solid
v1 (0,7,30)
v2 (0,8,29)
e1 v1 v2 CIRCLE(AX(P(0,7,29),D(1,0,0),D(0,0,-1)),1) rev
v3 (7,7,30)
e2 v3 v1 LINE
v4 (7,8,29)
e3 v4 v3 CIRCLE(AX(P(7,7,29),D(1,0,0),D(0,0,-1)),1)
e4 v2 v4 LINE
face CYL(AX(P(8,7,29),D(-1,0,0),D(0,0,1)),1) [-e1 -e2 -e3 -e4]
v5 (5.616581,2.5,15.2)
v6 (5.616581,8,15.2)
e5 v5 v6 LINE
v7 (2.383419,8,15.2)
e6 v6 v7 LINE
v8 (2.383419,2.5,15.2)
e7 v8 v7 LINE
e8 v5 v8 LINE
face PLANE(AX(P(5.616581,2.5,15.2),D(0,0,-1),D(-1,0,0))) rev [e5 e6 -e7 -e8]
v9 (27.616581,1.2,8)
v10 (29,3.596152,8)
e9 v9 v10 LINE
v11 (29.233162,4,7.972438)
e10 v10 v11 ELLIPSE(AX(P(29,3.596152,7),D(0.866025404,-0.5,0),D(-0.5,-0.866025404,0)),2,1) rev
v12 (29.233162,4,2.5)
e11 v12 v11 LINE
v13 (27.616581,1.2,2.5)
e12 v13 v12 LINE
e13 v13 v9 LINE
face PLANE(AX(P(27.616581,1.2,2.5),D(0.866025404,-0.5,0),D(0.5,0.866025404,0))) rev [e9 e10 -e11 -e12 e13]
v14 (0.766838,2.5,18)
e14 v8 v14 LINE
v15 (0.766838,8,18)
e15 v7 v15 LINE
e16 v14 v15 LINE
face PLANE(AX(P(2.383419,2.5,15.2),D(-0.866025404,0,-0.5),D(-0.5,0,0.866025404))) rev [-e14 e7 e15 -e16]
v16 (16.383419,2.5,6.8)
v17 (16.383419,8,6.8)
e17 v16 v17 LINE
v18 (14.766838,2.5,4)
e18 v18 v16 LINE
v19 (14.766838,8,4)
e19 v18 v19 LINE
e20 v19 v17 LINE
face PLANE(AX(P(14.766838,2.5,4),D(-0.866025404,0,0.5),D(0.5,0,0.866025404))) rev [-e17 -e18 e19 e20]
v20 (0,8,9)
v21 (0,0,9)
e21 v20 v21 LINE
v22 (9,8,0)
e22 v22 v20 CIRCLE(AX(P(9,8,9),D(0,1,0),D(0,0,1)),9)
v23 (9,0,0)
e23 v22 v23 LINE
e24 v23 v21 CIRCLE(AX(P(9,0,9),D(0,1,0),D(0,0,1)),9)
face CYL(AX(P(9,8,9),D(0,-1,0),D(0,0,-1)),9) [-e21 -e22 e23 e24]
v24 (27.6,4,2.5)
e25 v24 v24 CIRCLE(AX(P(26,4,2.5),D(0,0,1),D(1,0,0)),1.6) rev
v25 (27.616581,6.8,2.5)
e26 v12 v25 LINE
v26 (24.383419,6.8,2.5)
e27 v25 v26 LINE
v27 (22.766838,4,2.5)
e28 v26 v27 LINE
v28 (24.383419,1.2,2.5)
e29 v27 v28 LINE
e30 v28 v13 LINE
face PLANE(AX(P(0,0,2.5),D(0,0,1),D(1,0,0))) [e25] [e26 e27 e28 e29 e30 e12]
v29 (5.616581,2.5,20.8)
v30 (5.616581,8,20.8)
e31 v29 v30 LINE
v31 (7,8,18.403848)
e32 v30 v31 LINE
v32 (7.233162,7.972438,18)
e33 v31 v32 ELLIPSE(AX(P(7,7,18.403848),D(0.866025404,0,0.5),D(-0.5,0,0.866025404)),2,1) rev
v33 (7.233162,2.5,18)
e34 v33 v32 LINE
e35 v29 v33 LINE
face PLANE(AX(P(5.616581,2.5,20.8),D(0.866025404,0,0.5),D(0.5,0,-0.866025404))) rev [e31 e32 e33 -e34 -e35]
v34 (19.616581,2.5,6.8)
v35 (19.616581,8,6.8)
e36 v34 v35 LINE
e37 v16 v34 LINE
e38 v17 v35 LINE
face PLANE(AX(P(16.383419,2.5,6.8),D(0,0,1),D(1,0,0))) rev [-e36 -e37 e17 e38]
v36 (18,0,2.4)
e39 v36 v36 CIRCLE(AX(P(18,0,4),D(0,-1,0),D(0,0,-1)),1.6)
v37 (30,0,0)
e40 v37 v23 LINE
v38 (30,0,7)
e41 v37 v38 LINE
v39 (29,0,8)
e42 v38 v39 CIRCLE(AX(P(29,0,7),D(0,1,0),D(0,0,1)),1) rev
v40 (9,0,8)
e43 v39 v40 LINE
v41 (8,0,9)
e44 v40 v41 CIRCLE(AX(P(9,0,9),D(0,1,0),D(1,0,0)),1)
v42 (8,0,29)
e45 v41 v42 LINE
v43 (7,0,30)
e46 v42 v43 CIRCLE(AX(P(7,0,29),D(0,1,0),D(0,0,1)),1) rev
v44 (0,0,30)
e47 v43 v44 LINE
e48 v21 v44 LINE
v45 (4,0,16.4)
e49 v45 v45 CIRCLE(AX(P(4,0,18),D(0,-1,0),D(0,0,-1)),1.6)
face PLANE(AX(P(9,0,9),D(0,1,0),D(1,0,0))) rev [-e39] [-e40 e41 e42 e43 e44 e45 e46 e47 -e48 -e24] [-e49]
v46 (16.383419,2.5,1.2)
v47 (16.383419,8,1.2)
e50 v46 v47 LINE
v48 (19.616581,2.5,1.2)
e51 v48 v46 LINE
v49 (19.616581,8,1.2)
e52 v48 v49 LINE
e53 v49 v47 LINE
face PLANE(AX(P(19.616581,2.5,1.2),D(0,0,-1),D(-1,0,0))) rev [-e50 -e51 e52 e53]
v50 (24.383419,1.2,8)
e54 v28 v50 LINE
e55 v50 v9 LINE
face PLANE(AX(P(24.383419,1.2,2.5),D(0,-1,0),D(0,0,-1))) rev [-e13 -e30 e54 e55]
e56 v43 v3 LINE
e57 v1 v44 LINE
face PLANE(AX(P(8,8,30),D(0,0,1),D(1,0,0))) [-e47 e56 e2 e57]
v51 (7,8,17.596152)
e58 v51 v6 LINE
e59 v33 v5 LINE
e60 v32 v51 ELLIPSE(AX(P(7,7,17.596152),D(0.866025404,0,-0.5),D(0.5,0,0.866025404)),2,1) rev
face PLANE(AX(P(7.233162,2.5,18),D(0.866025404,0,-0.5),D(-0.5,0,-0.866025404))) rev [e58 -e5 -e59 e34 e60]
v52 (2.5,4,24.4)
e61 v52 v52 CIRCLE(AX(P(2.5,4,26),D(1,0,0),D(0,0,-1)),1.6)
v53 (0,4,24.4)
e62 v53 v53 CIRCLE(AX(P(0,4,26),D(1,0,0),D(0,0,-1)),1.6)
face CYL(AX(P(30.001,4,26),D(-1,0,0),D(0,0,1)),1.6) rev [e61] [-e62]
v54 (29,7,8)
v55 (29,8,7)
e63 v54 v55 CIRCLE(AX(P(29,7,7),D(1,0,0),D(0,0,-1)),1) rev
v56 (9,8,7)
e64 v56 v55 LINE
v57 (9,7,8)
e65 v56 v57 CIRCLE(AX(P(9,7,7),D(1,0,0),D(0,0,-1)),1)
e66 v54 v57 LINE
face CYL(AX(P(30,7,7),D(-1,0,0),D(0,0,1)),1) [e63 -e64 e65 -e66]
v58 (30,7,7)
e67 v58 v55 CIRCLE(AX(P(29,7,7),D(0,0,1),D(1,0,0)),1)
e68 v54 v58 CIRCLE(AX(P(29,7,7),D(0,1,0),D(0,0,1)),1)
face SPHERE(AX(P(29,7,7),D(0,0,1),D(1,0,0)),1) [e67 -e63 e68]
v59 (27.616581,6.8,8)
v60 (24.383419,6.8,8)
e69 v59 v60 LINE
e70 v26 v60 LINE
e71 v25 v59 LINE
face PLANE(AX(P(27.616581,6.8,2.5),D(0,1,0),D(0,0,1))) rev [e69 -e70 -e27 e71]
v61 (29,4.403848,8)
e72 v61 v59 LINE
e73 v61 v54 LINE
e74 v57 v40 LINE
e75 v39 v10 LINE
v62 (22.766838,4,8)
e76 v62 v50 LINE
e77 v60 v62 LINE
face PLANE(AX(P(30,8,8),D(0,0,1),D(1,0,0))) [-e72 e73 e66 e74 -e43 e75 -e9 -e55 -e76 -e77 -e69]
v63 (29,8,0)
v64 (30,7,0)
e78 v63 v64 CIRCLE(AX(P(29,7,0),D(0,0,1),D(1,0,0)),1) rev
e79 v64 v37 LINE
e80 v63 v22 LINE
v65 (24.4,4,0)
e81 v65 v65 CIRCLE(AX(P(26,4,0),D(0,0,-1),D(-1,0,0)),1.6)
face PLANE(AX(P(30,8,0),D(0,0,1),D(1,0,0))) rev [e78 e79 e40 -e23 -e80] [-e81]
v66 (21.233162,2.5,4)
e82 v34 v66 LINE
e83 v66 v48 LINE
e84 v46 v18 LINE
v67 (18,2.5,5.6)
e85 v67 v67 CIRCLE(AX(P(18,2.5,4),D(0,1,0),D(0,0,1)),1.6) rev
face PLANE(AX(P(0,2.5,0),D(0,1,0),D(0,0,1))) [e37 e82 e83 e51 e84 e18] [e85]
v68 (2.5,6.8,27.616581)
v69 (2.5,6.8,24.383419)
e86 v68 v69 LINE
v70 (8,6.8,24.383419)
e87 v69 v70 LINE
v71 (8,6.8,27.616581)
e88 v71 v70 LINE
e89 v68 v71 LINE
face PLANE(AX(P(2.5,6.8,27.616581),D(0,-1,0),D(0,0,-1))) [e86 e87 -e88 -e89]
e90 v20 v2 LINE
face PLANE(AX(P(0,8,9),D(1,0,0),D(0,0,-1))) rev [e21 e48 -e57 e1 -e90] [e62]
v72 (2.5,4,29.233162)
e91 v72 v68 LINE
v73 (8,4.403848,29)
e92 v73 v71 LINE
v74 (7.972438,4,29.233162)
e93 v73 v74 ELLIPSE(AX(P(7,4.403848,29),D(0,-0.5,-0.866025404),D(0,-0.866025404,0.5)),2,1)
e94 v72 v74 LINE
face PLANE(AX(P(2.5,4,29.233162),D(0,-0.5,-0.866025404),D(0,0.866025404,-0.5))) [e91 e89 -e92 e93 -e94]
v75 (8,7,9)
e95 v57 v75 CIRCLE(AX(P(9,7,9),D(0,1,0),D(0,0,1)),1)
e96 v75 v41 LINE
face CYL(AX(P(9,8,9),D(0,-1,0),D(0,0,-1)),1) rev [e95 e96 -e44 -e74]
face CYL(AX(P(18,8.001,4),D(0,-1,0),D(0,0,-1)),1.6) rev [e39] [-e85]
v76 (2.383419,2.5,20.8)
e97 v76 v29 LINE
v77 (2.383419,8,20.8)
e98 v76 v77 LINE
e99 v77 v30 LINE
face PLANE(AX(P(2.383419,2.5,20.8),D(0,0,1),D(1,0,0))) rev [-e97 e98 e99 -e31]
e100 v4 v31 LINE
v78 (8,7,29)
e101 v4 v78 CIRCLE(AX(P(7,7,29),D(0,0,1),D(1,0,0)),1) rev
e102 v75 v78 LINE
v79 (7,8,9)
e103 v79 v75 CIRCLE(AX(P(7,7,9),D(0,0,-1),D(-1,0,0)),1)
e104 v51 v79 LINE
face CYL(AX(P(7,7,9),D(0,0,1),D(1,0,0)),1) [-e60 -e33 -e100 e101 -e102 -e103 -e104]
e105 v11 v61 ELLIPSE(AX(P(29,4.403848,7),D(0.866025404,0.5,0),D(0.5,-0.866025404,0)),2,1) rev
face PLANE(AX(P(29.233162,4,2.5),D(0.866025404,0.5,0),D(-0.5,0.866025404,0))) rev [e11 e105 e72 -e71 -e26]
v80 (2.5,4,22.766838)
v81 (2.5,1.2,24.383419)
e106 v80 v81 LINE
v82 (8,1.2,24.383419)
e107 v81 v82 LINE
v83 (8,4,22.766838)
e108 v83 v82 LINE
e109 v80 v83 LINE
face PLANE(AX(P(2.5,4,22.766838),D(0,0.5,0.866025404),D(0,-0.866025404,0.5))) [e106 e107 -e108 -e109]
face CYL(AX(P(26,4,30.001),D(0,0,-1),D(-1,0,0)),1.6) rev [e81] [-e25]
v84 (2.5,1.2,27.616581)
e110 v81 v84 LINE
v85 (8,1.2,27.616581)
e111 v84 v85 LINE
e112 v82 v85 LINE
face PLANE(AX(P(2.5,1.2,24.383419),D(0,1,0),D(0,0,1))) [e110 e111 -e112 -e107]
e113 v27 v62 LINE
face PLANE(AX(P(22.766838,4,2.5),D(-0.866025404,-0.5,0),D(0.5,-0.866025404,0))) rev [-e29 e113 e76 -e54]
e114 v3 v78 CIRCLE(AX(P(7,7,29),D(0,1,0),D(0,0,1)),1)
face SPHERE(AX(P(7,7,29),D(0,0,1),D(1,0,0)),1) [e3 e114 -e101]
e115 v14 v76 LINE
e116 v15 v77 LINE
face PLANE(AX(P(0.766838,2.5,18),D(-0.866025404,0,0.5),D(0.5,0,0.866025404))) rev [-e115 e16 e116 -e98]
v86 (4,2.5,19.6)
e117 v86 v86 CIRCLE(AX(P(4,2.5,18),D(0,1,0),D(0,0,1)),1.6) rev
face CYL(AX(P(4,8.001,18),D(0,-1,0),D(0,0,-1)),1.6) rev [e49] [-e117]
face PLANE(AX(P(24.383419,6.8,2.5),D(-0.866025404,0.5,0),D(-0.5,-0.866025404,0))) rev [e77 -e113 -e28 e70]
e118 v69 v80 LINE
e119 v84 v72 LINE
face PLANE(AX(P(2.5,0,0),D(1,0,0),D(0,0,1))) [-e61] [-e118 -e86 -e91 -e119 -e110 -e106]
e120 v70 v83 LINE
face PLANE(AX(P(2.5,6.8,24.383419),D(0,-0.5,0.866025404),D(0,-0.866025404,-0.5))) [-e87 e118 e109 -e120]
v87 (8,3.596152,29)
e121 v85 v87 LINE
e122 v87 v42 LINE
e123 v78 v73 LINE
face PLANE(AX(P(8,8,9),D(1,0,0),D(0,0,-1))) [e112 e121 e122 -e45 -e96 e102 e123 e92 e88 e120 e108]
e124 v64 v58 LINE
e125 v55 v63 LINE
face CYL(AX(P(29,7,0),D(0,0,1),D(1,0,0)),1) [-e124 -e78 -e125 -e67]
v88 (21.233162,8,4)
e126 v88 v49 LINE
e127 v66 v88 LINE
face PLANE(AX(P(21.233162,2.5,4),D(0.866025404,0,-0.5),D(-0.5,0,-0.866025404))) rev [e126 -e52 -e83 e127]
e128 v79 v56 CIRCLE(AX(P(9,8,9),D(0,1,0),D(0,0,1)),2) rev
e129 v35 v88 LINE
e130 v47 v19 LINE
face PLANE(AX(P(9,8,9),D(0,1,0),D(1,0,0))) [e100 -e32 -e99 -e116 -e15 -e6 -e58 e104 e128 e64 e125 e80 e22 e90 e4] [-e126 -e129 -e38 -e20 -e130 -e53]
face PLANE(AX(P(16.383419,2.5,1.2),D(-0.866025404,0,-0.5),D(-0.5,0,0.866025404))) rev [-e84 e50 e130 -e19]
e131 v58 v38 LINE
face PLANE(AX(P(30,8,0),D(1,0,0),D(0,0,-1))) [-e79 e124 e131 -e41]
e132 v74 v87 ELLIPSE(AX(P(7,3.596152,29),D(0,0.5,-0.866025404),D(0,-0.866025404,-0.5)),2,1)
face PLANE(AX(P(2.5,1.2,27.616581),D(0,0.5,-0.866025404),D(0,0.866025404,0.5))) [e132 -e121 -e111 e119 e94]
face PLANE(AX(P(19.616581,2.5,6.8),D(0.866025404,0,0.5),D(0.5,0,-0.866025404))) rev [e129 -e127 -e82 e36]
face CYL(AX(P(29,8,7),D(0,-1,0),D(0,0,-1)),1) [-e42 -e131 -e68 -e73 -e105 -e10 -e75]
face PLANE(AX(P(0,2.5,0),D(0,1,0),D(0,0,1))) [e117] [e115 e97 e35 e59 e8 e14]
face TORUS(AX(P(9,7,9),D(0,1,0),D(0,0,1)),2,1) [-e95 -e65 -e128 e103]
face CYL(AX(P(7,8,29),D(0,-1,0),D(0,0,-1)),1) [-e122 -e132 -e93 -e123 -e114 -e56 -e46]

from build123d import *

# Parameters (mm, degrees)
EXTRU_MINCE1_DEPTH      = 8
ENL_V_MAT_EXTRU_1_REACH = 45.174
ESQUISSE2_R             = 1.6
ENL_V_MAT_EXTRU_2_DEPTH = 5.5
ENL_V_MAT_EXTRU_3_REACH = 45.174
ESQUISSE4_R             = 1.6
ENL_V_MAT_EXTRU_4_DEPTH = 5.5
CONG_1_R                = 1


with BuildPart() as part:
    # Esquisse1 → Extru.-Mince1 (new body)
    with BuildSketch(Plane(origin=(0, 0, 0), x_dir=(1, 0, 0), z_dir=(0, 1, 0))):
        with BuildLine():
            Line((30, 0), (9, 0))
            ThreePointArc((9, 0), (2.636038969, -2.636038969), (0, -9))
            Line((0, -9), (0, -30))
            Line((0, -30), (8, -30))
            Line((8, -30), (8, -9))
            ThreePointArc((8, -9), (8.292893219, -8.292893219), (9, -8))
            Line((9, -8), (30, -8))
            Line((30, -8), (30, 0))
        make_face()
    extrude(amount=EXTRU_MINCE1_DEPTH)

    # Esquisse2 → Enlèv. mat.-Extru.1 (cut, up to next)
    with BuildSketch(Plane.XZ, mode=Mode.PRIVATE) as enl_v_mat_extru_1_sk1:
        with Locations(Location((18, 4, 0), (0, 0, 270))):
            Circle(ESQUISSE2_R)
    enl_v_mat_extru_1_tool1 = extrude(enl_v_mat_extru_1_sk1.sketch, amount=-ENL_V_MAT_EXTRU_1_REACH, mode=Mode.PRIVATE) & part.part
    # Esquisse2 → Enlèv. mat.-Extru.1 (cut, up to next)
    with BuildSketch(Plane.XZ, mode=Mode.PRIVATE) as enl_v_mat_extru_1_sk2:
        with Locations(Location((4, 18, 0), (0, 0, 270))):
            Circle(ESQUISSE2_R)
    enl_v_mat_extru_1_tool2 = extrude(enl_v_mat_extru_1_sk2.sketch, amount=-ENL_V_MAT_EXTRU_1_REACH, mode=Mode.PRIVATE) & part.part
    add(enl_v_mat_extru_1_tool1.solids().sort_by_distance((18, 0, 4))[0], mode=Mode.SUBTRACT)
    add(enl_v_mat_extru_1_tool2.solids().sort_by_distance((4, 0, 18))[0], mode=Mode.SUBTRACT)

    # Esquisse3 → Enlèv. mat.-Extru.2 (cut)
    with BuildSketch(Plane(origin=(0, 8, 0), x_dir=(1, 0, 0), z_dir=(0, 1, 0))):
        Polygon((5.616580754, -20.8), (7.233161507, -18), (5.616580754, -15.2), (2.383419246, -15.2), (0.766838493, -18), (2.383419246, -20.8), align=None)
        Polygon((19.616580754, -6.8), (21.233161507, -4), (19.616580754, -1.2), (16.383419246, -1.2), (14.766838493, -4), (16.383419246, -6.8), align=None)
    extrude(amount=-ENL_V_MAT_EXTRU_2_DEPTH, mode=Mode.SUBTRACT)

    # Esquisse4 → Enlèv. mat.-Extru.3 (cut, up to next)
    with BuildSketch(Plane(origin=(0, 0, 0), x_dir=(-1, 0, 0), z_dir=(0, 0, -1)), mode=Mode.PRIVATE) as enl_v_mat_extru_3_sk1:
        with Locations((-26, 4)):
            Circle(ESQUISSE4_R)
    enl_v_mat_extru_3_tool1 = extrude(enl_v_mat_extru_3_sk1.sketch, amount=-ENL_V_MAT_EXTRU_3_REACH, mode=Mode.PRIVATE) & part.part
    enl_v_mat_extru_3 = enl_v_mat_extru_3_tool1.solids().sort_by_distance((26, 4, 0))[0]
    add(enl_v_mat_extru_3, mode=Mode.SUBTRACT)

    # Esquisse5 → Enlèv. mat.-Extru.4 (cut)
    with BuildSketch(Plane.XY.offset(8)):
        Polygon((27.616580754, 1.2), (29.233161507, 4), (27.616580754, 6.8), (24.383419246, 6.8), (22.766838493, 4), (24.383419246, 1.2), align=None)
    enl_v_mat_extru_4 = extrude(amount=-ENL_V_MAT_EXTRU_4_DEPTH, mode=Mode.SUBTRACT)

    # Symétrie1: Enlèv. mat.-Extru.3, Enlèv. mat.-Extru.4 across plane
    add(enl_v_mat_extru_3.mirror(Plane(origin=(0, 0, 0), x_dir=(0.7071067811865476, 0, 0.7071067811865475), z_dir=(0.7071067811865475, 0, -0.7071067811865476))), mode=Mode.SUBTRACT)
    add(enl_v_mat_extru_4.mirror(Plane(origin=(0, 0, 0), x_dir=(0.7071067811865476, 0, 0.7071067811865475), z_dir=(0.7071067811865475, 0, -0.7071067811865476))), mode=Mode.SUBTRACT)

    # Congé1
    # the kernel refuses this fillet: 1 mm, written as the material it takes off along each edge
    with BuildSketch(Plane(origin=(7, 7, 29), x_dir=(0, 1, 0), z_dir=(1, 0, 0))) as cong_1_piece_1_section:
        Polygon((0, 0), (CONG_1_R, 0), (CONG_1_R, CONG_1_R), (0, CONG_1_R), align=None)
    cong_1_piece_1 = extrude(amount=CONG_1_R, mode=Mode.PRIVATE)
    cong_1_piece_1 = cong_1_piece_1 - Plane(origin=(7, 7, 29), x_dir=(0, -0.7071067811865475, -0.7071067811865475), z_dir=(1, 0, 0)) * Sphere(CONG_1_R, mode=Mode.PRIVATE)
    add(cong_1_piece_1, mode=Mode.SUBTRACT)
    with BuildSketch(Plane(origin=(29, 7, 7), x_dir=(0, 1, 0), z_dir=(0, 0, 1))) as cong_1_piece_2_section:
        Polygon((0, 0), (CONG_1_R, 0), (CONG_1_R, -CONG_1_R), (0, -CONG_1_R), align=None)
    cong_1_piece_2 = extrude(amount=CONG_1_R, mode=Mode.PRIVATE)
    cong_1_piece_2 = cong_1_piece_2 - Plane(origin=(29, 7, 7), x_dir=(-0.7071067811865475, -0.7071067811865475, 0), z_dir=(0, 0, 1)) * Sphere(CONG_1_R, mode=Mode.PRIVATE)
    add(cong_1_piece_2, mode=Mode.SUBTRACT)
    with BuildSketch(Plane(origin=(8, 8, 29), x_dir=(-1, 0, 0), z_dir=(0, 0, -1))) as cong_1_piece_3:
        with BuildLine():
            CenterArc((CONG_1_R, -CONG_1_R), CONG_1_R, 90, 90)
            Line((0, -CONG_1_R), (0, 0))
            Line((0, 0), (CONG_1_R, 0))
        make_face()
    extrude(amount=20, mode=Mode.SUBTRACT)
    with BuildSketch(Plane(origin=(30, -2.5, 8), x_dir=(-1, 0, 0), z_dir=(0, 1, 0)), Plane(origin=(30, 8, 7), x_dir=(-1, 0, 0), z_dir=(0, 0, -1)), Plane(origin=(-2.5, 8, 30), x_dir=(0, 0, -1), z_dir=(1, 0, 0))) as cong_1_piece_4:
        with BuildLine():
            CenterArc((CONG_1_R, -CONG_1_R), CONG_1_R, 90, 90)
            Line((0, -CONG_1_R), (0, 0))
            Line((0, 0), (CONG_1_R, 0))
        make_face()
    extrude(amount=9.5, mode=Mode.SUBTRACT)
    with BuildSketch(Plane(origin=(8, -2.5, 30), x_dir=(0, 0, -1), z_dir=(0, 1, 0))) as cong_1_piece_5:
        with BuildLine():
            CenterArc((CONG_1_R, CONG_1_R), CONG_1_R, 180, 90)
            Line((0, CONG_1_R), (0, 0))
            Line((0, 0), (CONG_1_R, 0))
        make_face()
    extrude(amount=9.5, mode=Mode.SUBTRACT)
    with BuildSketch(Plane(origin=(9, 8, 9), x_dir=(-1, 0, 0), z_dir=(0, 0, 1))) as cong_1_piece_6:
        with BuildLine():
            CenterArc((1 + CONG_1_R, CONG_1_R), CONG_1_R, 180, 90)
            Line((1 + CONG_1_R, 0), (1, 0))
            Line((1, 0), (1, CONG_1_R))
        make_face()
    revolve(axis=Axis((9, 8, 9), (0, -1, 0)), revolution_arc=90, mode=Mode.SUBTRACT)
    with BuildSketch(Plane(origin=(9, 8, 8), x_dir=(0, -1, 0), z_dir=(1, 0, 0))) as cong_1_piece_7:
        with BuildLine():
            CenterArc((CONG_1_R, CONG_1_R), CONG_1_R, 180, 90)
            Line((0, CONG_1_R), (0, 0))
            Line((0, 0), (CONG_1_R, 0))
        make_face()
    extrude(amount=20, mode=Mode.SUBTRACT)


solid = part.part
